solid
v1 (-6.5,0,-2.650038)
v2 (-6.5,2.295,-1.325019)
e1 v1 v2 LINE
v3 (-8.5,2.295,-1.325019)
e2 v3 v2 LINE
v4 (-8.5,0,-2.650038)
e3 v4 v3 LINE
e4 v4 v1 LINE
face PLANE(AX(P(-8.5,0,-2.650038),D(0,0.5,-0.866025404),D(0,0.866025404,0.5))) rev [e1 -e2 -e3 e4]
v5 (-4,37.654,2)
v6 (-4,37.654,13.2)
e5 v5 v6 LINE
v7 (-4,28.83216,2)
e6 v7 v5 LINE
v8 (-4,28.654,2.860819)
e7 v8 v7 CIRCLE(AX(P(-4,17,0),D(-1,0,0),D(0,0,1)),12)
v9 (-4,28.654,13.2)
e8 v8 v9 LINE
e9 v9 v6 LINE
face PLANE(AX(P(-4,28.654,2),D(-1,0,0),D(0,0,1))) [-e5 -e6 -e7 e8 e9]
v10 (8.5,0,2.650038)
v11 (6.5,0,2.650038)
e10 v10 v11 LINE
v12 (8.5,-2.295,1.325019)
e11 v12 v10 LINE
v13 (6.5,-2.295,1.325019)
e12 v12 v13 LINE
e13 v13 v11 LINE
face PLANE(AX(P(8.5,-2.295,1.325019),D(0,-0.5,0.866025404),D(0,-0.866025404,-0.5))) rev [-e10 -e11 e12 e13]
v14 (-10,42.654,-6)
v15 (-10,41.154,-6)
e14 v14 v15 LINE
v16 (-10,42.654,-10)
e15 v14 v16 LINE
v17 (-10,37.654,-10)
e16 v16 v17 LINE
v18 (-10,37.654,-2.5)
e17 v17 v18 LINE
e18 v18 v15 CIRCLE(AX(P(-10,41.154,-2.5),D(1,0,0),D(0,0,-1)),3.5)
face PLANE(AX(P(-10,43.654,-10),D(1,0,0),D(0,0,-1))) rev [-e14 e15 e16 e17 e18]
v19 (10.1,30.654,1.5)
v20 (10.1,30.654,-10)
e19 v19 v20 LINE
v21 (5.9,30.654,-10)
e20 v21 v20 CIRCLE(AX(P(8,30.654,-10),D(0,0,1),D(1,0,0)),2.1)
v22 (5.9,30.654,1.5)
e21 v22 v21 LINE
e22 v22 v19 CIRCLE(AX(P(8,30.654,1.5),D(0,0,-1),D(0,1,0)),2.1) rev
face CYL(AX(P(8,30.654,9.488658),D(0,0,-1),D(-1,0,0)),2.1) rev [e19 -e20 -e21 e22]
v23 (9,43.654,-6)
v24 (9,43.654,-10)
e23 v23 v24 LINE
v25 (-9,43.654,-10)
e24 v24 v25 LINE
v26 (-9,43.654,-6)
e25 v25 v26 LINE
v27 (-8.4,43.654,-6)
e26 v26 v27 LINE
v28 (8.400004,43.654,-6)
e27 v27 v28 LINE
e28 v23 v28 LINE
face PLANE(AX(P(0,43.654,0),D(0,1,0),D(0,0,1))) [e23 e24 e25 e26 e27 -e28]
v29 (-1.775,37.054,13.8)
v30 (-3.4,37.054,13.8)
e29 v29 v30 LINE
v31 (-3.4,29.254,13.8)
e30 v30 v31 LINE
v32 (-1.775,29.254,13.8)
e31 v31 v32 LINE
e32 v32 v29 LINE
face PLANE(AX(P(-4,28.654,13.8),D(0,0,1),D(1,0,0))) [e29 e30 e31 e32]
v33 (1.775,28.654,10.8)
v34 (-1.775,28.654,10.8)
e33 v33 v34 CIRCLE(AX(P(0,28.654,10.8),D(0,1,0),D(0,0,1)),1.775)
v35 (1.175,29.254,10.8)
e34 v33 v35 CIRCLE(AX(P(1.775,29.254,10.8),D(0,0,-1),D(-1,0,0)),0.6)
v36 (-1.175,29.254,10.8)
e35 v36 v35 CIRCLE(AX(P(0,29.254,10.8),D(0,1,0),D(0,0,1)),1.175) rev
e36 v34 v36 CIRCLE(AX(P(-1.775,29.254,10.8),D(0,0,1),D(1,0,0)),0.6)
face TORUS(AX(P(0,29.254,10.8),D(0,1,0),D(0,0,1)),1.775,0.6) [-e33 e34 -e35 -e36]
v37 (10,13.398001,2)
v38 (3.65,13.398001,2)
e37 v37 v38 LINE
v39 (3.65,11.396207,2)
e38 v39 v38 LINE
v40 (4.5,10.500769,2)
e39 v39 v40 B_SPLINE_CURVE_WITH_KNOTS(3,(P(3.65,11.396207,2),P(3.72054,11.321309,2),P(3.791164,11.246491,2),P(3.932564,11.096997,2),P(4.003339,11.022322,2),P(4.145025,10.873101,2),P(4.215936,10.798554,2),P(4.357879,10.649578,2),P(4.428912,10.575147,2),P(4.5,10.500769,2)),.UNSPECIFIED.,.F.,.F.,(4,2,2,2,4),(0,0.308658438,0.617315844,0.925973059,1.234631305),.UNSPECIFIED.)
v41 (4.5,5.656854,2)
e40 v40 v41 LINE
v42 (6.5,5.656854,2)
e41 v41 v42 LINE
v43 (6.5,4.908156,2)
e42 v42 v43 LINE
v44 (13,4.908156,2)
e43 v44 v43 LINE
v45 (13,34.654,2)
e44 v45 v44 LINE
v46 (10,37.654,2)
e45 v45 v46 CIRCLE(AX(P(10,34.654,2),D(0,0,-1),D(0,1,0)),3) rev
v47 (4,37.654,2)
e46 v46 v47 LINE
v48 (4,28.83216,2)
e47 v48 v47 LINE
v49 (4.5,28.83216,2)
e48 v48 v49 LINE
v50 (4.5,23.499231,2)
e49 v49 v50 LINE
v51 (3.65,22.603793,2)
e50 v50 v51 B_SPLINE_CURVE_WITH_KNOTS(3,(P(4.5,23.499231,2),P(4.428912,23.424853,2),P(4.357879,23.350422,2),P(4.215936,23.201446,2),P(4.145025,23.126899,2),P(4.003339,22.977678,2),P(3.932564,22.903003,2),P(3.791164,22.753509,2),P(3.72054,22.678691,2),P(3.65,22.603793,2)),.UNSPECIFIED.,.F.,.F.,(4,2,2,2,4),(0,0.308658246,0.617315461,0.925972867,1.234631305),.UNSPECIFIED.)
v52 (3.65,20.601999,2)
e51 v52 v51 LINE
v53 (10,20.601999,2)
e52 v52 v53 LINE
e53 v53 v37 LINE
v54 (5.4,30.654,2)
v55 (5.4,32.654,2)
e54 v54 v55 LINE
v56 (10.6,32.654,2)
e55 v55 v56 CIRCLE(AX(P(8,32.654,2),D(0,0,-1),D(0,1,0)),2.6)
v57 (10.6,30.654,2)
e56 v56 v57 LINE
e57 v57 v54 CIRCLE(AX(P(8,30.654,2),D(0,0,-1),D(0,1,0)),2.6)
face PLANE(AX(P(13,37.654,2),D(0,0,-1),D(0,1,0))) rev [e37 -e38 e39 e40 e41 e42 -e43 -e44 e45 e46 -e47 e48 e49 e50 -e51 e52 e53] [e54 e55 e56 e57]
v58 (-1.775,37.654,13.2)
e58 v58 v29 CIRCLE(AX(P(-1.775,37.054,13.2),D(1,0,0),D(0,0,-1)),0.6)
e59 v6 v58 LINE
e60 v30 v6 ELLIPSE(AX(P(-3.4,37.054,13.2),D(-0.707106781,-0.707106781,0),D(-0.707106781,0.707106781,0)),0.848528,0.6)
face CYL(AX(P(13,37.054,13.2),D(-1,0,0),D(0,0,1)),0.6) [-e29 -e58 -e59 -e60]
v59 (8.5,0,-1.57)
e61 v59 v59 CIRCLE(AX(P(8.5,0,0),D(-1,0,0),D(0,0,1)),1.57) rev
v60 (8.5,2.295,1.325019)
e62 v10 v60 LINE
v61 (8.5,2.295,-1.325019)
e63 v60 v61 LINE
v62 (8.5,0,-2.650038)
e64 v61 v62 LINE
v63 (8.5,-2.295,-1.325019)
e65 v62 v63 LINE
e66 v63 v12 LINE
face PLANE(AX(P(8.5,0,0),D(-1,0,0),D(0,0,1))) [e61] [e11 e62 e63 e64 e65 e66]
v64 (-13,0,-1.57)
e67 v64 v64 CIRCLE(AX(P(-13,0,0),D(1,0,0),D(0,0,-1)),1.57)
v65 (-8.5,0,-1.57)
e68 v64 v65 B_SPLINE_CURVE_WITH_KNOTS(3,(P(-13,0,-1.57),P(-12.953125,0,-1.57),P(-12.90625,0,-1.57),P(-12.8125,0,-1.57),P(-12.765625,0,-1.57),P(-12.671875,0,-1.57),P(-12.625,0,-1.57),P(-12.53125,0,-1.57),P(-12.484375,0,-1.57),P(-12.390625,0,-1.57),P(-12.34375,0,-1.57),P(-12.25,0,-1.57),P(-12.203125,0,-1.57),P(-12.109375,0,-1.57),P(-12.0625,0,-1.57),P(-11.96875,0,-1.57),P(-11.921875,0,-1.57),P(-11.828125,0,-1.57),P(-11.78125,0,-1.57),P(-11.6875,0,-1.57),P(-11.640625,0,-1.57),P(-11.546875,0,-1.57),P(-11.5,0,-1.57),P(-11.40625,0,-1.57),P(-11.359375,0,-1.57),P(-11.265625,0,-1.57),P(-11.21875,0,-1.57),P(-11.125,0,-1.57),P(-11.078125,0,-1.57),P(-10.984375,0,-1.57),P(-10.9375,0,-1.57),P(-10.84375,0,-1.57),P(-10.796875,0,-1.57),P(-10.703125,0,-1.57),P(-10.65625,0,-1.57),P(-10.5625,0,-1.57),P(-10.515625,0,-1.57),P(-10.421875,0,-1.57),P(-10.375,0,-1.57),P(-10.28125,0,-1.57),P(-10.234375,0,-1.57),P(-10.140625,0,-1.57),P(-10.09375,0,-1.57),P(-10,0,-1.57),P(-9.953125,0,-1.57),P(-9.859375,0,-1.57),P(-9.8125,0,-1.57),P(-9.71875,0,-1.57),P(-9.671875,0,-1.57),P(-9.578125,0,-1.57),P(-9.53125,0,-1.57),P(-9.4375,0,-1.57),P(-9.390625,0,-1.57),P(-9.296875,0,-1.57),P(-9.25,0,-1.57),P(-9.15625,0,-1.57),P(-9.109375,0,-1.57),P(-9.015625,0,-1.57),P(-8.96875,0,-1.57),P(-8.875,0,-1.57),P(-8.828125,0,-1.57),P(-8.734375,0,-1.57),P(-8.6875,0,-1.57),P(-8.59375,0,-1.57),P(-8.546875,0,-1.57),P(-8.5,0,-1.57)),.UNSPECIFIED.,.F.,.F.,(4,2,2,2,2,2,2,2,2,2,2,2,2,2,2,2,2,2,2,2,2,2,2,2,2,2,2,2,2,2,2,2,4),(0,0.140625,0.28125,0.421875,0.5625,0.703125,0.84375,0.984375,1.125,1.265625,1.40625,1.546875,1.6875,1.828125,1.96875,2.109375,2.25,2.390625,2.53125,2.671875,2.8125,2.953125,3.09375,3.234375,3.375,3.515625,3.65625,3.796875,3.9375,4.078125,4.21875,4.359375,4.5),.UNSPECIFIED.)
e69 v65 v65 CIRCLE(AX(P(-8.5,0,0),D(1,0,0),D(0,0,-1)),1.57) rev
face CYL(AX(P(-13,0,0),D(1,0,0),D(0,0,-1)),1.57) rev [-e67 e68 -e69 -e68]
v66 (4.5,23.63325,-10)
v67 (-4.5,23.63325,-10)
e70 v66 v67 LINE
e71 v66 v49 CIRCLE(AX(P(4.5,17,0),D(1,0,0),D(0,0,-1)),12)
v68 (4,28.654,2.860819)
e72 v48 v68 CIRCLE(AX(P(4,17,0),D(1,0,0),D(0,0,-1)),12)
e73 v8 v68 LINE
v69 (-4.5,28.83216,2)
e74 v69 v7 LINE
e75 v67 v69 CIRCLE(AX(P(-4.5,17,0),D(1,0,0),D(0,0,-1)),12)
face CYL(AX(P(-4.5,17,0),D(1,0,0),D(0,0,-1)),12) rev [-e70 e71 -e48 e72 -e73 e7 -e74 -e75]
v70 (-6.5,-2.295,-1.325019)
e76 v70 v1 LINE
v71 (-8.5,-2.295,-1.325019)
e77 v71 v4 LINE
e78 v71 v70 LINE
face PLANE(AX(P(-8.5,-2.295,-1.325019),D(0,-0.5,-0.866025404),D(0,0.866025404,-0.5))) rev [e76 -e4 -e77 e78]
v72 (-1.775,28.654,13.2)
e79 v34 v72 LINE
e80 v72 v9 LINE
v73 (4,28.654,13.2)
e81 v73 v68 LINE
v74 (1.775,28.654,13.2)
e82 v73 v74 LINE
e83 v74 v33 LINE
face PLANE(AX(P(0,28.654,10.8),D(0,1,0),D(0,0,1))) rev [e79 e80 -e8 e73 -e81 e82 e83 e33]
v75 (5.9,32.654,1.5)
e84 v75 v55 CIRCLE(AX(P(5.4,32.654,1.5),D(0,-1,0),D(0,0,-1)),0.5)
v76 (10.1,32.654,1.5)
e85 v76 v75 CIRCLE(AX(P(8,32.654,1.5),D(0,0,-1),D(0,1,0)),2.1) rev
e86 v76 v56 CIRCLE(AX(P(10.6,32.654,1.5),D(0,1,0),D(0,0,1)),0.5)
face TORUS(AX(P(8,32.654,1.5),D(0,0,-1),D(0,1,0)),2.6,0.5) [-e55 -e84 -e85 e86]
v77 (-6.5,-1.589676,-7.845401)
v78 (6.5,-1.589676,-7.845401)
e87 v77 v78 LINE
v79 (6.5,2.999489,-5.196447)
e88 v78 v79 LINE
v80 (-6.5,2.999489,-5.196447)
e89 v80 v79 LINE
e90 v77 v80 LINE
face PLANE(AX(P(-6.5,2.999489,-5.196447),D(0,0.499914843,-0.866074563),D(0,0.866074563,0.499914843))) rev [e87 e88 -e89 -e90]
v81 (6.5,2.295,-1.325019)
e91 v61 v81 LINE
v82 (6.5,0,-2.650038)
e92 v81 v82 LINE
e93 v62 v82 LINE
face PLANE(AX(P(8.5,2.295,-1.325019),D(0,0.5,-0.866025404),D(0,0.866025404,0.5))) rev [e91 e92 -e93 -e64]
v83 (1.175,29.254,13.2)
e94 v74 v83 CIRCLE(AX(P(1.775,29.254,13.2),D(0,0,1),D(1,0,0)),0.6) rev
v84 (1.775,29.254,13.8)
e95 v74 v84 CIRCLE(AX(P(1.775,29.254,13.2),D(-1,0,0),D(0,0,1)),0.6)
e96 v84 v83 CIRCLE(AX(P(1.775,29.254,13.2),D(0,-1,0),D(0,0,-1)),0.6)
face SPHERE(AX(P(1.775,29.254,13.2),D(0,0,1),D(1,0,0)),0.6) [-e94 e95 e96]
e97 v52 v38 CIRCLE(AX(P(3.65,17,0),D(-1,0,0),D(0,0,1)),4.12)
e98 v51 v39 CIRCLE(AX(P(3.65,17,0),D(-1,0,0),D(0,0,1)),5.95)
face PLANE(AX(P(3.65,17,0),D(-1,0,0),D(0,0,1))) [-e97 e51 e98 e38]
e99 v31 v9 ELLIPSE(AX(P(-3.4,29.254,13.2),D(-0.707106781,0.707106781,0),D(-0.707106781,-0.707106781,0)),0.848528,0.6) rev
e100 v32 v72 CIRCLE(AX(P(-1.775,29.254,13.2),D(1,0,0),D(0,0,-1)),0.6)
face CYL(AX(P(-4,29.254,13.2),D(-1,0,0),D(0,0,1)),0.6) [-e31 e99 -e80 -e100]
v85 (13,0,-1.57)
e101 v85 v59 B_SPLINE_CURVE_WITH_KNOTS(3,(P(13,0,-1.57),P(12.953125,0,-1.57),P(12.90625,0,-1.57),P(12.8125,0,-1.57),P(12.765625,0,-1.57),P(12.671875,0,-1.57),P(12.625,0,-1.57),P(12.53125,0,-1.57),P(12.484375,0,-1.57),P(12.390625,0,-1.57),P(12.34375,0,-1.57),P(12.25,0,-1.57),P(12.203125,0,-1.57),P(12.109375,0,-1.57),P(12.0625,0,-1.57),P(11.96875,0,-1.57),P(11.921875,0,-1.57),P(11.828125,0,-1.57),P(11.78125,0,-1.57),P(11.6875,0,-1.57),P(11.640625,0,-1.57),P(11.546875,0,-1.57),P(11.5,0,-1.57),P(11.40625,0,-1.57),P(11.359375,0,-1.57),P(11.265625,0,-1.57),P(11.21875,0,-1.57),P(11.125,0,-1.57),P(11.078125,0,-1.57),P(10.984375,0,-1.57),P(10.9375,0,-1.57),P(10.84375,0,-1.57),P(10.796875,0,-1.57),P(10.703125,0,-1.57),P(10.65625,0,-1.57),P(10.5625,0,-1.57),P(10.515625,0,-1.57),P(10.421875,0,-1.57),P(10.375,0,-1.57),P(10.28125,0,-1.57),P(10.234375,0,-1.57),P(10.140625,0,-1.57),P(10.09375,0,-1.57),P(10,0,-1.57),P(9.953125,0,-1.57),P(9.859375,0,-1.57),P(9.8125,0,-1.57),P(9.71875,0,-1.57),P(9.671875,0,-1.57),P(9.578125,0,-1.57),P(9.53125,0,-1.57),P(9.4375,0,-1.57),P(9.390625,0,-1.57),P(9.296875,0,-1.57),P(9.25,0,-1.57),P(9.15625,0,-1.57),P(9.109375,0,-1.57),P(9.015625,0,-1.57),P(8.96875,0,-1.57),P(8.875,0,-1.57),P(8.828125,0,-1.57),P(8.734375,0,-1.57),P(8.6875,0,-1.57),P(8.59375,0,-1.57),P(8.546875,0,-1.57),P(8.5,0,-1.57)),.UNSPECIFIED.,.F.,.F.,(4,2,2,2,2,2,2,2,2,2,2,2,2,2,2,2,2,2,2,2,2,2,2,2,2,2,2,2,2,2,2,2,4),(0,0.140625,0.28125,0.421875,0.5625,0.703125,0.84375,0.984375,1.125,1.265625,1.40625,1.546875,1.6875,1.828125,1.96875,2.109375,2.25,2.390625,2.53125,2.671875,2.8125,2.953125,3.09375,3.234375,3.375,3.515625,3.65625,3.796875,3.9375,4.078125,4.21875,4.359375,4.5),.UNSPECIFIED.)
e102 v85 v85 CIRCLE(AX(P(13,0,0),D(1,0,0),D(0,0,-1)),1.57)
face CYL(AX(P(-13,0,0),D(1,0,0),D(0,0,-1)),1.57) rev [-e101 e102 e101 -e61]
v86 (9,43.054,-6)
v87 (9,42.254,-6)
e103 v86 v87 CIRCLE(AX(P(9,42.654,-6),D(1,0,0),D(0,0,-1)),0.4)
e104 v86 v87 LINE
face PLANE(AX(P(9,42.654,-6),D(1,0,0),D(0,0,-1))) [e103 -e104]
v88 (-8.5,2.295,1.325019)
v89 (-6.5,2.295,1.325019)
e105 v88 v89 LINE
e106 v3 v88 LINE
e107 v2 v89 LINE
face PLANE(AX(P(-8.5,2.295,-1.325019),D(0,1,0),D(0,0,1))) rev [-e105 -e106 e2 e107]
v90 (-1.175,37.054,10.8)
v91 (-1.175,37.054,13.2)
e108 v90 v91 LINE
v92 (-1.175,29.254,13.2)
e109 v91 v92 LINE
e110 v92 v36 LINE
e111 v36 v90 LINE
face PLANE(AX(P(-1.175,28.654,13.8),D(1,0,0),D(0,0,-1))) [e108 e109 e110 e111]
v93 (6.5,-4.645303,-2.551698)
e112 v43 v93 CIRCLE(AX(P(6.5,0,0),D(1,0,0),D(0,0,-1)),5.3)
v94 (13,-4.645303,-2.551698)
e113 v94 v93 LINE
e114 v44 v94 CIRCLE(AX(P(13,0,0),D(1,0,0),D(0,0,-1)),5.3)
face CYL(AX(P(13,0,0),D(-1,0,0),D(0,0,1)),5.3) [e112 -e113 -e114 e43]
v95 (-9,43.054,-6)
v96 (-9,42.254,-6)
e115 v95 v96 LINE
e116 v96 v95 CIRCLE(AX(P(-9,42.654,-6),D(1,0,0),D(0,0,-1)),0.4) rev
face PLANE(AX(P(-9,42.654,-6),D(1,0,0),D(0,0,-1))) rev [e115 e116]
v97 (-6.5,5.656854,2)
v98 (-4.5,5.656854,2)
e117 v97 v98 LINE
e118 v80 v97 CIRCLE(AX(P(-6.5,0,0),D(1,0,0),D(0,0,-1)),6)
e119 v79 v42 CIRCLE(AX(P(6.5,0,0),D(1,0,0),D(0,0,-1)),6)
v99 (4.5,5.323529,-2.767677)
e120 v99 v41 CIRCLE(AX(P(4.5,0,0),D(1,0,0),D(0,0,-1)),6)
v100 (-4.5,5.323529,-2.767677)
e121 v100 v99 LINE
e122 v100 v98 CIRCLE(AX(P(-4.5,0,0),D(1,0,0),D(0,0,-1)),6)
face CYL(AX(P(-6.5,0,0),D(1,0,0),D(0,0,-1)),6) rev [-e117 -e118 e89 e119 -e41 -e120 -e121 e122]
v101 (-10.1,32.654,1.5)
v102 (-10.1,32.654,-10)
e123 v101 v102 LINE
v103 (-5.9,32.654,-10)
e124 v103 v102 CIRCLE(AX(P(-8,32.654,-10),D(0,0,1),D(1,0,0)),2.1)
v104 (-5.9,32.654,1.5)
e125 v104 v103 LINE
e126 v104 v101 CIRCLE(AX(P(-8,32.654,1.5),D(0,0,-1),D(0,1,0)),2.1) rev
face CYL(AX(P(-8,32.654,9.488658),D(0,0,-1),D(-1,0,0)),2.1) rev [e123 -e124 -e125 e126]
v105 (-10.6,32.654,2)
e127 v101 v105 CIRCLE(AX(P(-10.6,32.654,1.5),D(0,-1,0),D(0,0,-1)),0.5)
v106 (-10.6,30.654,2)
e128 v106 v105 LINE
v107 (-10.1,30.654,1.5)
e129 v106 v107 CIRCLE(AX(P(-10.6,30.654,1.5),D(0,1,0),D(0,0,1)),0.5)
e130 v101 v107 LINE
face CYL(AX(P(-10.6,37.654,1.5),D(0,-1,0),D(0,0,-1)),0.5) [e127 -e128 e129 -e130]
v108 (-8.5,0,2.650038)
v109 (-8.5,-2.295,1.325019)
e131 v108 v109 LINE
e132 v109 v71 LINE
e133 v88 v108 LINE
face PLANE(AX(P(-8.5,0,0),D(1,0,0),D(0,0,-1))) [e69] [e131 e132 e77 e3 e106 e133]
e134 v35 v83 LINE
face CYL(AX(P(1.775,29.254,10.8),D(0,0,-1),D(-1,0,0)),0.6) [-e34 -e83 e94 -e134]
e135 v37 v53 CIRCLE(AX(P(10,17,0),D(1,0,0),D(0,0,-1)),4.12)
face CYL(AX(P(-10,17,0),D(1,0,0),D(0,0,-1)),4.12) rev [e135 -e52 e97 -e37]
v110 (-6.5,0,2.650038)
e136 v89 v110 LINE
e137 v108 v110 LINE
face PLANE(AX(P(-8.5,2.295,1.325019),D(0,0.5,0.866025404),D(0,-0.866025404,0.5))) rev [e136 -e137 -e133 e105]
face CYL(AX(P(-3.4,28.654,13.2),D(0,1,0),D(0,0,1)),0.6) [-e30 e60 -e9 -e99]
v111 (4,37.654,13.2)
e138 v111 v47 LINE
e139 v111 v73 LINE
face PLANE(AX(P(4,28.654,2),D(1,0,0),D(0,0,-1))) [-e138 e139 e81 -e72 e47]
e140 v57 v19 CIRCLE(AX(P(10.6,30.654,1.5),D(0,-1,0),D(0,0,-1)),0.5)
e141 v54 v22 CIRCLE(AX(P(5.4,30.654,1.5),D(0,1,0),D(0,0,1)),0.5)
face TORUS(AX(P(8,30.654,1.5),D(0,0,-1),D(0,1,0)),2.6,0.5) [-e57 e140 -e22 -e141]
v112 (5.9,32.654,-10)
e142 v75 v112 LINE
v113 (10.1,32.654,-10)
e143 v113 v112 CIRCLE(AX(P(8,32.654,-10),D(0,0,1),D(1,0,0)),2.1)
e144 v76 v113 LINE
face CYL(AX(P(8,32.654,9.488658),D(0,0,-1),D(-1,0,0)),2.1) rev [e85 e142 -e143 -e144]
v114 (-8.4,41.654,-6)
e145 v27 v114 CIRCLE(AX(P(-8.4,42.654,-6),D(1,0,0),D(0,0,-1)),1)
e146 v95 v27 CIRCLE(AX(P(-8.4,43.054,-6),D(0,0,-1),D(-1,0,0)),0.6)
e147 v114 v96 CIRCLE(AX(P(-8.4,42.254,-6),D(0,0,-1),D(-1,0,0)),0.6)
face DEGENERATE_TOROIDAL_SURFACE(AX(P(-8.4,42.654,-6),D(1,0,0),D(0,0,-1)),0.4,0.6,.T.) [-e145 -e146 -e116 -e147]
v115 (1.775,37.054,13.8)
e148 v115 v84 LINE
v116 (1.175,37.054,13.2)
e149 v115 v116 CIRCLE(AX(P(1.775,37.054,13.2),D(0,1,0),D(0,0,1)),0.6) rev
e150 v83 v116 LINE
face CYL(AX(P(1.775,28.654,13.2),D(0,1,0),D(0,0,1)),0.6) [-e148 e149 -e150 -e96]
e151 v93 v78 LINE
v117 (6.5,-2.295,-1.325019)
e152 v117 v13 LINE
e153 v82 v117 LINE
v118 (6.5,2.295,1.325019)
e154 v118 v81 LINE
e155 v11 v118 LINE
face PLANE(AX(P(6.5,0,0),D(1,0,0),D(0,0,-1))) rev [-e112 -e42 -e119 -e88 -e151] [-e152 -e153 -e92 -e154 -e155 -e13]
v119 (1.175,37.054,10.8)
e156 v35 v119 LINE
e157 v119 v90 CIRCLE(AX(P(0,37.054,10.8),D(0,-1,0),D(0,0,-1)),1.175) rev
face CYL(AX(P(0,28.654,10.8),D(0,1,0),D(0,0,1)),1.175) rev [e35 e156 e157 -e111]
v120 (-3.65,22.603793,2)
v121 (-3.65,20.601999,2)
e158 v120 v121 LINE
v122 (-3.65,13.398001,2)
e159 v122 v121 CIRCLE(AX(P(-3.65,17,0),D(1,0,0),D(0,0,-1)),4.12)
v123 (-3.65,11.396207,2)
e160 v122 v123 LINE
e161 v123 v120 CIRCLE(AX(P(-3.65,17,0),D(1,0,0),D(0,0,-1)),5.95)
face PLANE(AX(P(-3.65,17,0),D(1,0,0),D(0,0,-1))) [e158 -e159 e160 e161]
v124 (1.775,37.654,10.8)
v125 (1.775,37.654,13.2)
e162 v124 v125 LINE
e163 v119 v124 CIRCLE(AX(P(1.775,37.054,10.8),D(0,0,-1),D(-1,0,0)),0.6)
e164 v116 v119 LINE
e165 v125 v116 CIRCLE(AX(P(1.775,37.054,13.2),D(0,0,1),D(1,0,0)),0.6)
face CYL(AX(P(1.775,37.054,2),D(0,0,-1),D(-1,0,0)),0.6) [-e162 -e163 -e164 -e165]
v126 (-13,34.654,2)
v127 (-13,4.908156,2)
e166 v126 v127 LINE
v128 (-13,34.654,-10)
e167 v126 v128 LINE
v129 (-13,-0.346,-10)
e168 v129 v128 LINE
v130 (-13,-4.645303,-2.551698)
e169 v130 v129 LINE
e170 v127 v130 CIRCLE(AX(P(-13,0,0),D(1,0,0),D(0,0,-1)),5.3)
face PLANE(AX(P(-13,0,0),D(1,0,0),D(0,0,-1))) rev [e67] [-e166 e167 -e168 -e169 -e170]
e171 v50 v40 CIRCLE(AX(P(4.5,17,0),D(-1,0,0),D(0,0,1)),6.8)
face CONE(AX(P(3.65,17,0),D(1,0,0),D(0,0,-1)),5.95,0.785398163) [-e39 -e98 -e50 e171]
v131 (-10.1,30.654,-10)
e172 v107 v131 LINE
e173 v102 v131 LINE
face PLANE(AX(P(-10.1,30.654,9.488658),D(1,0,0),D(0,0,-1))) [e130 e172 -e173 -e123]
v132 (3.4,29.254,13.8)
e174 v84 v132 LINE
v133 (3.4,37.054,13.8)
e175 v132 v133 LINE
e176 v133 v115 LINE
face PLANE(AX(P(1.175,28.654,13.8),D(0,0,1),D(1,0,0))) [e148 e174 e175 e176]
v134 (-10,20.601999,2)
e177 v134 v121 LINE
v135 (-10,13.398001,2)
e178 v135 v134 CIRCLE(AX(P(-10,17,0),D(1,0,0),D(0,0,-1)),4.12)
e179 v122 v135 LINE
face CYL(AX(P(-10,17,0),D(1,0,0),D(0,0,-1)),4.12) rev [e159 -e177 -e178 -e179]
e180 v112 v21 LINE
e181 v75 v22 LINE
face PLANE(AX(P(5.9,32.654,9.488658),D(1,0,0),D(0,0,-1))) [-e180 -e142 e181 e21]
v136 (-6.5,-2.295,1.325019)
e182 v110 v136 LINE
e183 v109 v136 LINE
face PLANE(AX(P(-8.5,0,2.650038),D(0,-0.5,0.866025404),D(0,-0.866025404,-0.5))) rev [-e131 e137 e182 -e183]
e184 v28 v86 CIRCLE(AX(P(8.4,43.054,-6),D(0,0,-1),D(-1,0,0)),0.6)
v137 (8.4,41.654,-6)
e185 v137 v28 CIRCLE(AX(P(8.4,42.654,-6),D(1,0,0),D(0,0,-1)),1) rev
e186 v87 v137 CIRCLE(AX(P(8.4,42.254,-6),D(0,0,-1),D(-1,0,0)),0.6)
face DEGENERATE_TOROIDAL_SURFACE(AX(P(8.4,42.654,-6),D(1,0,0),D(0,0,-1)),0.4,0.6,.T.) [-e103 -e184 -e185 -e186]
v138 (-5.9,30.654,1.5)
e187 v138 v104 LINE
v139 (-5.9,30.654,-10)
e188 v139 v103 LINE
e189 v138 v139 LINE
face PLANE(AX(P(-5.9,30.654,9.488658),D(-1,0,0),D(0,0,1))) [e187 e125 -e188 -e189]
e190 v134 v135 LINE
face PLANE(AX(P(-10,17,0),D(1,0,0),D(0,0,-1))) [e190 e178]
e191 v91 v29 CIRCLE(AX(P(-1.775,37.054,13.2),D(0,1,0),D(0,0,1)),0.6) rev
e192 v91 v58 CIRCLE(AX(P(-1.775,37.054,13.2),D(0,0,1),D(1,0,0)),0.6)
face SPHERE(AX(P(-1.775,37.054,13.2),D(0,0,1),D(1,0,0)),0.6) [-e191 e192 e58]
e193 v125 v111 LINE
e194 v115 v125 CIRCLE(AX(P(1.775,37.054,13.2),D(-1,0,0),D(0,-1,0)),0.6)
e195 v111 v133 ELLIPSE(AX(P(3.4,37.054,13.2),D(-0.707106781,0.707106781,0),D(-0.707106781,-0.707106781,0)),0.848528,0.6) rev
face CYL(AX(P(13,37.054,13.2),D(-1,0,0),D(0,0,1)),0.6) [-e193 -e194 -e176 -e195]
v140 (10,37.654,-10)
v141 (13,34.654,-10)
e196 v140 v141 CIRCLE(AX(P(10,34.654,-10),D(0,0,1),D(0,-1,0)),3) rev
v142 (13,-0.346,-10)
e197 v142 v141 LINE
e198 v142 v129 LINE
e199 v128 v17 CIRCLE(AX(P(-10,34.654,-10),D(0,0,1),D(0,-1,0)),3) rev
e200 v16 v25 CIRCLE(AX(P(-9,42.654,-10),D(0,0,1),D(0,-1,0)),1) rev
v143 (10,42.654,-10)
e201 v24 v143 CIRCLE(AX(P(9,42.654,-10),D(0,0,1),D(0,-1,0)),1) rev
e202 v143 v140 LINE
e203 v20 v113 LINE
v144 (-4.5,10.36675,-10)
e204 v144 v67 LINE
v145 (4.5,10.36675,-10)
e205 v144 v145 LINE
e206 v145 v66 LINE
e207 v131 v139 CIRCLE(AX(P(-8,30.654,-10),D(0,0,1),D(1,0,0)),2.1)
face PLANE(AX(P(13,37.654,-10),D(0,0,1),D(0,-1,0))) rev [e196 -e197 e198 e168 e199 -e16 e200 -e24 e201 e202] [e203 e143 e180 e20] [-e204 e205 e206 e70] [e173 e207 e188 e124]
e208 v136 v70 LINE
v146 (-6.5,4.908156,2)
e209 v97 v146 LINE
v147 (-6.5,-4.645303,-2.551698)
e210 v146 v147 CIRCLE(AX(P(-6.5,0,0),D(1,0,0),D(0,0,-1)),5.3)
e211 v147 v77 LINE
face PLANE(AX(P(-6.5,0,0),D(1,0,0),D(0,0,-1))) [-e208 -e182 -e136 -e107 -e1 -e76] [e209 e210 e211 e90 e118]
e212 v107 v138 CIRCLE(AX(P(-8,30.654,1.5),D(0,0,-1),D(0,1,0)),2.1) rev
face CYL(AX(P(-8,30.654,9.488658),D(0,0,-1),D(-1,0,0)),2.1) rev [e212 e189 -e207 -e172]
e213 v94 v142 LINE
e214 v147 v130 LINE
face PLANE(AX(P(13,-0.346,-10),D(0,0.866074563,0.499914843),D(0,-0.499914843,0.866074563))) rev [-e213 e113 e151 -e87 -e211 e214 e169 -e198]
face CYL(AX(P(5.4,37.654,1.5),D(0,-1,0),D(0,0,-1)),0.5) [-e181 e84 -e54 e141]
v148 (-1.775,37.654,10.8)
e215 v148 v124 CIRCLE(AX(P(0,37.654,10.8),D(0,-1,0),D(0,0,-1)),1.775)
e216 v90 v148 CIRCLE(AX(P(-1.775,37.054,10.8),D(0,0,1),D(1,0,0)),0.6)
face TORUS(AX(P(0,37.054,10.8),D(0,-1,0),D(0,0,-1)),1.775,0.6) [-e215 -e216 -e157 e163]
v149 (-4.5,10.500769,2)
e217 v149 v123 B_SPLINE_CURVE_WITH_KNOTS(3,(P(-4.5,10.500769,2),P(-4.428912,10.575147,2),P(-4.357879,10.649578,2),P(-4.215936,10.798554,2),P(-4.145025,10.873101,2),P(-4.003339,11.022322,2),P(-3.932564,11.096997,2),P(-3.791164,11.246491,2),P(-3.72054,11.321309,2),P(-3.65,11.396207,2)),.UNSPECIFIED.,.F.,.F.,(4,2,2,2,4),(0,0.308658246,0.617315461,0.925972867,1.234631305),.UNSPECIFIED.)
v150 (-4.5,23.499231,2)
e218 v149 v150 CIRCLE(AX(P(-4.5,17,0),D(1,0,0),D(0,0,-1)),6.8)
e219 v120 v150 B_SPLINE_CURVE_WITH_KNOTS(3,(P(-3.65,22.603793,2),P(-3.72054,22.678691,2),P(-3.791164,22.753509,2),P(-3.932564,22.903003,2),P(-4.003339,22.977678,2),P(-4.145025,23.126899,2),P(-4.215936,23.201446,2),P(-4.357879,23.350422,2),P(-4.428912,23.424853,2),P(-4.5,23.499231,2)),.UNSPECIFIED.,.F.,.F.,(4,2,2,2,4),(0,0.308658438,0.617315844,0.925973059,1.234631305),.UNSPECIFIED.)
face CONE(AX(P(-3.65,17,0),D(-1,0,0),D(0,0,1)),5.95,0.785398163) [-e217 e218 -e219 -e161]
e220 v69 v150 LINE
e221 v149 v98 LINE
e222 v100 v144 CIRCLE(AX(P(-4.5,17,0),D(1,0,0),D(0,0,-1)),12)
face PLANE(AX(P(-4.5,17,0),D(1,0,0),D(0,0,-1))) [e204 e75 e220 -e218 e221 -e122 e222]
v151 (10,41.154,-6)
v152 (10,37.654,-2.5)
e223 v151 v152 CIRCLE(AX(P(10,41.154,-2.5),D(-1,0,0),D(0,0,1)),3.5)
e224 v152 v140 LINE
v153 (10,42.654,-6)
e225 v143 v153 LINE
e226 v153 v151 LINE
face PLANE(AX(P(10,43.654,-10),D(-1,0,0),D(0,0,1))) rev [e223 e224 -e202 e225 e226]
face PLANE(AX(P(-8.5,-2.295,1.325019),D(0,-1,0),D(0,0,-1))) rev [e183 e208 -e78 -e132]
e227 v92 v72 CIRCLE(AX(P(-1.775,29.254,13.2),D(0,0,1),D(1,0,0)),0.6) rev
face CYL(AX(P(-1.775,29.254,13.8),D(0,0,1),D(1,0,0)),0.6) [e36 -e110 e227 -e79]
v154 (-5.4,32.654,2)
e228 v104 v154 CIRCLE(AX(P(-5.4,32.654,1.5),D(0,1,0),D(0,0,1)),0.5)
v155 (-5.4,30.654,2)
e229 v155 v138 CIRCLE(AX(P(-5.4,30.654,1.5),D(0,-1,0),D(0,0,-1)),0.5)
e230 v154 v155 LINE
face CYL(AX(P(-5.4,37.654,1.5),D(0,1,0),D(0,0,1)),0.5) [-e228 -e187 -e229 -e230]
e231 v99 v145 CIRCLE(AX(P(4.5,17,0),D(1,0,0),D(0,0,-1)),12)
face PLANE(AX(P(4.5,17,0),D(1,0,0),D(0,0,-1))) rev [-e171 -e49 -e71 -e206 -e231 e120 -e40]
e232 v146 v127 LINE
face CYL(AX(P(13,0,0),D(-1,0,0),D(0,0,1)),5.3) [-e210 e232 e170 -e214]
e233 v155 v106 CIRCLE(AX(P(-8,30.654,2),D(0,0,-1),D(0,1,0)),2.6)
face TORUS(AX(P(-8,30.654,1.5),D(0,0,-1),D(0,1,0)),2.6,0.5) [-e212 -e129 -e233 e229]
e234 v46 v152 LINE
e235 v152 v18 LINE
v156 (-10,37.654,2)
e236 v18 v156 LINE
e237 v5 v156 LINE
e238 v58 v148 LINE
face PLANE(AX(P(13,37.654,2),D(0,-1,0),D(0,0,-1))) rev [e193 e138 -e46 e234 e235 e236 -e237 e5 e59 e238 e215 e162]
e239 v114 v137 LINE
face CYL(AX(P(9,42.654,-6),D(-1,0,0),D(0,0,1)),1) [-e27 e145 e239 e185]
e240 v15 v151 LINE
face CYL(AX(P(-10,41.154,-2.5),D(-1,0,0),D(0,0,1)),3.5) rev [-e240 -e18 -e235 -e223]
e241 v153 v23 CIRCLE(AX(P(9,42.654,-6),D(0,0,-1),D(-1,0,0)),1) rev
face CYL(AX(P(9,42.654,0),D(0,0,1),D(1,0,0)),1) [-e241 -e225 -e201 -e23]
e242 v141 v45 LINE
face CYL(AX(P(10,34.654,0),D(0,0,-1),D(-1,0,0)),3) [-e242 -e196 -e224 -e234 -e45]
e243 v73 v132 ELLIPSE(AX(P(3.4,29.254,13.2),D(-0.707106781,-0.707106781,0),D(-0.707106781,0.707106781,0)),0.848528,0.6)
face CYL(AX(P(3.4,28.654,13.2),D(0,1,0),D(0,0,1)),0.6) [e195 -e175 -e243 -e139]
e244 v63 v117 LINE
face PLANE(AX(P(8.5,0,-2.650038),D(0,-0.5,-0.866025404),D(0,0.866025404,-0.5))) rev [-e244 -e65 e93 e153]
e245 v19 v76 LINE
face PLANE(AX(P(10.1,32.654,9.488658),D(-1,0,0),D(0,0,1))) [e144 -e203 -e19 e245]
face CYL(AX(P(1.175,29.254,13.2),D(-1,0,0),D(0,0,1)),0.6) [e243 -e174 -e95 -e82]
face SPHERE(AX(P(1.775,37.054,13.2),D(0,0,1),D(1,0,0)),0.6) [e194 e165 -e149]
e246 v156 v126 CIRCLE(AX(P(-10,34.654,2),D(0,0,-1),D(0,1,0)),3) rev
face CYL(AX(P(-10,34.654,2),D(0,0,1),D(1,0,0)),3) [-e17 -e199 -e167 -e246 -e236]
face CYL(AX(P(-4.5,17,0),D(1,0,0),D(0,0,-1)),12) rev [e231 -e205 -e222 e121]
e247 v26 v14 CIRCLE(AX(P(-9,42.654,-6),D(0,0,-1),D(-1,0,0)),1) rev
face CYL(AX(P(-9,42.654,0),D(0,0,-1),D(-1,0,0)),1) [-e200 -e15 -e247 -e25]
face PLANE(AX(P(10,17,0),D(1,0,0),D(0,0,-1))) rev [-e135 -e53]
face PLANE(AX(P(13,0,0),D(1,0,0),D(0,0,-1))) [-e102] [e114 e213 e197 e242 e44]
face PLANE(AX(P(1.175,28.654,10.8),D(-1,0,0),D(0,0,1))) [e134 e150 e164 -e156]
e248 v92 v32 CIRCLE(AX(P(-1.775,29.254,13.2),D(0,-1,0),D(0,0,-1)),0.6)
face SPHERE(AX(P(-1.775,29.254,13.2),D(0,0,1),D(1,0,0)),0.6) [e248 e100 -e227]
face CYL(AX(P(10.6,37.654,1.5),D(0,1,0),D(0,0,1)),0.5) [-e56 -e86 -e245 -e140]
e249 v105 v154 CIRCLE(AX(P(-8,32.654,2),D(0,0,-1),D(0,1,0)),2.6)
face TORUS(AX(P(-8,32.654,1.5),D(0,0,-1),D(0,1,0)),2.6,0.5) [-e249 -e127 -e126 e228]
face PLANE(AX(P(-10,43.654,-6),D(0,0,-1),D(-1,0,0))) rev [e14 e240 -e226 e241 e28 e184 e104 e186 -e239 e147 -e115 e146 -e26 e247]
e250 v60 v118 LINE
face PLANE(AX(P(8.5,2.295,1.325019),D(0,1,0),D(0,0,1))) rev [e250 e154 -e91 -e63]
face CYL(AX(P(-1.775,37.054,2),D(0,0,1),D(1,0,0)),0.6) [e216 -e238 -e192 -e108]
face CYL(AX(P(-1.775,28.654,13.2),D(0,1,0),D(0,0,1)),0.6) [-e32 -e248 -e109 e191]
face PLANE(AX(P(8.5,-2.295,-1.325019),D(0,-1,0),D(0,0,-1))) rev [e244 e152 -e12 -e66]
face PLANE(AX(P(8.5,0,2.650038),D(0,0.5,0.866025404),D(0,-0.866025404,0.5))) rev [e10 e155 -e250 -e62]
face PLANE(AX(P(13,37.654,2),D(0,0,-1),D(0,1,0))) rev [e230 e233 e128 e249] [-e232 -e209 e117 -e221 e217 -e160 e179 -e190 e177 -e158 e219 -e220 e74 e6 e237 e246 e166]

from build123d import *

# Parameters (mm, degrees)
BOSS_EXTRUDE1_DEPTH = 13
BOSS_EXTRUDE7_DEPTH = 9
SKETCH2_R           = 12
CUT_EXTRUDE1_DEPTH  = 4.5
CUT_EXTRUDE3_DEPTH  = 6.5
SKETCH6_R           = 1.57
CUT_EXTRUDE4_DEPTH  = 13
BOSS_EXTRUDE2_DEPTH = 0.85
BOSS_EXTRUDE3_START = 0.85
BOSS_EXTRUDE3_DEPTH = 0.85
SKETCH3_R           = 4.12
BEARING_AXIS_DEPTH  = 10
CHAMFER1_SIZE       = 0.85
CUT_EXTRUDE6_DEPTH  = 2
CUT_EXTRUDE7_DEPTH  = 2
SKETCH15_W          = 20
SKETCH15_H          = 4
BOSS_EXTRUDE4_DEPTH = 6
FILLET1_R           = 3.5
FILLET2_R           = 3
FILLET3_R           = 1
SKETCH16_R          = 1
BOSS_EXTRUDE5_DEPTH = 9
FILLET4_R           = 0.6
CUT_EXTRUDE8_DEPTH  = 12
FILLET5_R           = 0.6
FILLET6_R           = 0.5


with BuildPart() as part:
    # Sketch1 → Boss-Extrude1 (new, symmetric)
    with BuildSketch(Plane(origin=(0, 0, 0), x_dir=(0, 0, -1), z_dir=(1, 0, 0))):
        with BuildLine():
            Line((10, -0.346), (2.551698211, -4.645302599))
            ThreePointArc((2.551698211, -4.645302599), (-4.784687849, -2.279640803), (-2, 4.908156477))
            Line((-2, 4.908156477), (-2, 37.654))
            Line((-2, 37.654), (10, 37.654))
            Line((10, 37.654), (10, -0.346))
        make_face()
    extrude(amount=BOSS_EXTRUDE1_DEPTH, both=True)

    # Sketch17 → Boss-Extrude7 (add)
    with BuildSketch(Plane(origin=(0, 37.654, 0), x_dir=(1, 0, 0), z_dir=(0, 1, 0))):
        with BuildLine():
            Line((-4, -2), (4, -2))
            Line((4, -2), (4, -13.8))
            Line((4, -13.8), (1.175, -13.8))
            Line((1.175, -13.8), (1.175, -10.8))
            ThreePointArc((1.175, -10.8), (0, -9.625), (-1.175, -10.8))
            Line((-1.175, -10.8), (-1.175, -13.8))
            Line((-1.175, -13.8), (-4, -13.8))
            Line((-4, -13.8), (-4, -2))
        make_face()
    extrude(amount=-BOSS_EXTRUDE7_DEPTH)

    # Sketch2 → Cut-Extrude1 (cut, symmetric)
    with BuildSketch(Plane(origin=(0, 0, 0), x_dir=(0, 0, -1), z_dir=(1, 0, 0))):
        with Locations((0, 17)):
            Circle(SKETCH2_R)
    extrude(amount=CUT_EXTRUDE1_DEPTH, both=True, mode=Mode.SUBTRACT)

    # Sketch4 → Cut-Extrude3 (cut, symmetric)
    with BuildSketch(Plane(origin=(0, 0, 0), x_dir=(0, 0, -1), z_dir=(1, 0, 0))):
        with BuildLine():
            Line((5.196447381, 2.99948906), (7.845401268, -1.589675699))
            Line((7.845401268, -1.589675699), (7.845401268, -2.399293943))
            Line((7.845401268, -2.399293943), (2.99948906, -5.196447381))
            ThreePointArc((2.99948906, -5.196447381), (-5.795402235, 1.553484127), (5.196447381, 2.99948906))
        make_face()
    extrude(amount=CUT_EXTRUDE3_DEPTH, both=True, mode=Mode.SUBTRACT)

    # Sketch6 → Cut-Extrude4 (cut, symmetric)
    with BuildSketch(Plane(origin=(0, 0, 0), x_dir=(0, 0, -1), z_dir=(1, 0, 0))):
        Circle(SKETCH6_R)
    extrude(amount=CUT_EXTRUDE4_DEPTH, both=True, mode=Mode.SUBTRACT)

    # Sketch8 → Boss-Extrude2 (add)
    with BuildSketch(Plane(origin=(-4.5, 0, 0), x_dir=(0, 0, -1), z_dir=(1, 0, 0))):
        with BuildLine():
            Line((-2, 23.499230724), (-2, 10.500769276))
            ThreePointArc((-2, 10.500769276), (6.8, 17), (-2, 23.499230724))
        make_face()
    extrude(amount=BOSS_EXTRUDE2_DEPTH)

    # Sketch9 → Boss-Extrude3 (add)
    with BuildSketch(Plane.ZY.offset(-4.5).offset(BOSS_EXTRUDE3_START)):
        with BuildLine():
            Line((2, 23.499230724), (2, 10.500769276))
            ThreePointArc((2, 10.500769276), (-6.8, 17), (2, 23.499230724))
        make_face()
    extrude(amount=-BOSS_EXTRUDE3_DEPTH)

    # Sketch3 → bearing_axis (cut, symmetric)
    with BuildSketch(Plane(origin=(0, 0, 0), x_dir=(0, 0, -1), z_dir=(1, 0, 0))):
        with Locations((0, 17)):
            Circle(SKETCH3_R)
    extrude(amount=BEARING_AXIS_DEPTH, both=True, mode=Mode.SUBTRACT)

    # Chamfer1
    chamfer1_edges = [part.edges().sort_by_distance(p)[0] for p in [
        (3.65, 17, -6.8),
        (-3.65, 17, -6.8),
    ]]
    chamfer(chamfer1_edges, length=CHAMFER1_SIZE - 0.0001)  # a hair under: the kernel refuses the full size

    # Sketch12 → Cut-Extrude6 (cut)
    with BuildSketch(Plane(origin=(-6.5, 0, 0), x_dir=(0, 0, -1), z_dir=(1, 0, 0))):
        Polygon((2.650037736, 0), (1.325018868, 2.295), (-1.325018868, 2.295), (-2.650037736, 0), (-1.325018868, -2.295), (1.325018868, -2.295), align=None)
    extrude(amount=-CUT_EXTRUDE6_DEPTH, mode=Mode.SUBTRACT)

    # Sketch14 → Cut-Extrude7 (cut)
    with BuildSketch(Plane.ZY.offset(-6.5)):
        Polygon((-2.650037736, 0), (-1.325018868, -2.295), (1.325018868, -2.295), (2.650037736, 0), (1.325018868, 2.295), (-1.325018868, 2.295), align=None)
    extrude(amount=-CUT_EXTRUDE7_DEPTH, mode=Mode.SUBTRACT)

    # Sketch15 → Boss-Extrude4 (add)
    with BuildSketch(Plane(origin=(0, 37.654, 0), x_dir=(1, 0, 0), z_dir=(0, 1, 0))):
        with Locations((0, 8)):
            Rectangle(SKETCH15_W, SKETCH15_H)
    extrude(amount=BOSS_EXTRUDE4_DEPTH)

    # Fillet1
    fillet1_edges = [part.edges().sort_by_distance(p)[0] for p in [
        (0, 37.654, -6),
    ]]
    fillet(fillet1_edges, radius=FILLET1_R)

    # Fillet2
    fillet2_edges = [part.edges().sort_by_distance(p)[0] for p in [
        (-13, 37.654, -4),
        (13, 37.654, -4),
    ]]
    fillet(fillet2_edges, radius=FILLET2_R - 0.0001)  # a hair under: the kernel refuses the full size

    # Fillet3
    fillet3_edges = [part.edges().sort_by_distance(p)[0] for p in [
        (-10, 43.654, -8),
        (10, 43.654, -8),
    ]]
    fillet(fillet3_edges, radius=FILLET3_R)

    # Sketch16 → Boss-Extrude5 (add, symmetric)
    with BuildSketch(Plane(origin=(0, 0, 0), x_dir=(0, 0, -1), z_dir=(1, 0, 0))):
        with Locations((6, 42.654)):
            Circle(SKETCH16_R)
    extrude(amount=BOSS_EXTRUDE5_DEPTH, both=True)

    # Fillet4
    fillet4_edges = [part.edges().sort_by_distance(p)[0] for p in [
        (-9, 42.654, -5),
        (9, 42.654, -5),
    ]]
    fillet(fillet4_edges, radius=FILLET4_R)

    # Sketch18 → Cut-Extrude8 (cut)
    with BuildSketch(Plane.XY.offset(-10)):
        with BuildLine():
            Line((-10.1, 30.654), (-10.1, 32.654))
            ThreePointArc((-10.1, 32.654), (-8, 34.754), (-5.9, 32.654))
            Line((-5.9, 32.654), (-5.9, 30.654))
            ThreePointArc((-5.9, 30.654), (-8, 28.554), (-10.1, 30.654))
        make_face()
        with BuildLine():
            Line((10.1, 32.654), (10.1, 30.654))
            ThreePointArc((10.1, 30.654), (8, 28.554), (5.9, 30.654))
            Line((5.9, 30.654), (5.9, 32.654))
            ThreePointArc((5.9, 32.654), (8, 34.754), (10.1, 32.654))
        make_face()
    extrude(amount=CUT_EXTRUDE8_DEPTH, mode=Mode.SUBTRACT)

    # Fillet5
    fillet5_edges = [part.edges().sort_by_distance(p)[0] for p in [
        (2.5875, 28.654, 13.8),
        (4, 33.154, 13.8),
        (1.175, 28.654, 12.3),
        (1.175, 33.154, 13.8),
        (0, 28.654, 9.625),
        (-1.175, 28.654, 12.3),
        (-2.5875, 28.654, 13.8),
        (-1.175, 33.154, 13.8),
        (-4, 33.154, 13.8),
        (2.5875, 37.654, 13.8),
        (-2.5875, 37.654, 13.8),
        (-1.175, 37.654, 12.3),
        (0, 37.654, 9.625),
        (1.175, 37.654, 12.3),
    ]]
    fillet(fillet5_edges, radius=FILLET5_R)

    # Fillet6
    fillet6_edges = [part.edges().sort_by_distance(p)[0] for p in [
        (-10.1, 31.654, 2),
        (-8, 34.754, 2),
        (-5.9, 31.654, 2),
        (-8, 28.554, 2),
        (10.1, 31.654, 2),
        (8, 28.554, 2),
        (5.9, 31.654, 2),
        (8, 34.754, 2),
    ]]
    fillet(fillet6_edges, radius=FILLET6_R)


solid = part.part
